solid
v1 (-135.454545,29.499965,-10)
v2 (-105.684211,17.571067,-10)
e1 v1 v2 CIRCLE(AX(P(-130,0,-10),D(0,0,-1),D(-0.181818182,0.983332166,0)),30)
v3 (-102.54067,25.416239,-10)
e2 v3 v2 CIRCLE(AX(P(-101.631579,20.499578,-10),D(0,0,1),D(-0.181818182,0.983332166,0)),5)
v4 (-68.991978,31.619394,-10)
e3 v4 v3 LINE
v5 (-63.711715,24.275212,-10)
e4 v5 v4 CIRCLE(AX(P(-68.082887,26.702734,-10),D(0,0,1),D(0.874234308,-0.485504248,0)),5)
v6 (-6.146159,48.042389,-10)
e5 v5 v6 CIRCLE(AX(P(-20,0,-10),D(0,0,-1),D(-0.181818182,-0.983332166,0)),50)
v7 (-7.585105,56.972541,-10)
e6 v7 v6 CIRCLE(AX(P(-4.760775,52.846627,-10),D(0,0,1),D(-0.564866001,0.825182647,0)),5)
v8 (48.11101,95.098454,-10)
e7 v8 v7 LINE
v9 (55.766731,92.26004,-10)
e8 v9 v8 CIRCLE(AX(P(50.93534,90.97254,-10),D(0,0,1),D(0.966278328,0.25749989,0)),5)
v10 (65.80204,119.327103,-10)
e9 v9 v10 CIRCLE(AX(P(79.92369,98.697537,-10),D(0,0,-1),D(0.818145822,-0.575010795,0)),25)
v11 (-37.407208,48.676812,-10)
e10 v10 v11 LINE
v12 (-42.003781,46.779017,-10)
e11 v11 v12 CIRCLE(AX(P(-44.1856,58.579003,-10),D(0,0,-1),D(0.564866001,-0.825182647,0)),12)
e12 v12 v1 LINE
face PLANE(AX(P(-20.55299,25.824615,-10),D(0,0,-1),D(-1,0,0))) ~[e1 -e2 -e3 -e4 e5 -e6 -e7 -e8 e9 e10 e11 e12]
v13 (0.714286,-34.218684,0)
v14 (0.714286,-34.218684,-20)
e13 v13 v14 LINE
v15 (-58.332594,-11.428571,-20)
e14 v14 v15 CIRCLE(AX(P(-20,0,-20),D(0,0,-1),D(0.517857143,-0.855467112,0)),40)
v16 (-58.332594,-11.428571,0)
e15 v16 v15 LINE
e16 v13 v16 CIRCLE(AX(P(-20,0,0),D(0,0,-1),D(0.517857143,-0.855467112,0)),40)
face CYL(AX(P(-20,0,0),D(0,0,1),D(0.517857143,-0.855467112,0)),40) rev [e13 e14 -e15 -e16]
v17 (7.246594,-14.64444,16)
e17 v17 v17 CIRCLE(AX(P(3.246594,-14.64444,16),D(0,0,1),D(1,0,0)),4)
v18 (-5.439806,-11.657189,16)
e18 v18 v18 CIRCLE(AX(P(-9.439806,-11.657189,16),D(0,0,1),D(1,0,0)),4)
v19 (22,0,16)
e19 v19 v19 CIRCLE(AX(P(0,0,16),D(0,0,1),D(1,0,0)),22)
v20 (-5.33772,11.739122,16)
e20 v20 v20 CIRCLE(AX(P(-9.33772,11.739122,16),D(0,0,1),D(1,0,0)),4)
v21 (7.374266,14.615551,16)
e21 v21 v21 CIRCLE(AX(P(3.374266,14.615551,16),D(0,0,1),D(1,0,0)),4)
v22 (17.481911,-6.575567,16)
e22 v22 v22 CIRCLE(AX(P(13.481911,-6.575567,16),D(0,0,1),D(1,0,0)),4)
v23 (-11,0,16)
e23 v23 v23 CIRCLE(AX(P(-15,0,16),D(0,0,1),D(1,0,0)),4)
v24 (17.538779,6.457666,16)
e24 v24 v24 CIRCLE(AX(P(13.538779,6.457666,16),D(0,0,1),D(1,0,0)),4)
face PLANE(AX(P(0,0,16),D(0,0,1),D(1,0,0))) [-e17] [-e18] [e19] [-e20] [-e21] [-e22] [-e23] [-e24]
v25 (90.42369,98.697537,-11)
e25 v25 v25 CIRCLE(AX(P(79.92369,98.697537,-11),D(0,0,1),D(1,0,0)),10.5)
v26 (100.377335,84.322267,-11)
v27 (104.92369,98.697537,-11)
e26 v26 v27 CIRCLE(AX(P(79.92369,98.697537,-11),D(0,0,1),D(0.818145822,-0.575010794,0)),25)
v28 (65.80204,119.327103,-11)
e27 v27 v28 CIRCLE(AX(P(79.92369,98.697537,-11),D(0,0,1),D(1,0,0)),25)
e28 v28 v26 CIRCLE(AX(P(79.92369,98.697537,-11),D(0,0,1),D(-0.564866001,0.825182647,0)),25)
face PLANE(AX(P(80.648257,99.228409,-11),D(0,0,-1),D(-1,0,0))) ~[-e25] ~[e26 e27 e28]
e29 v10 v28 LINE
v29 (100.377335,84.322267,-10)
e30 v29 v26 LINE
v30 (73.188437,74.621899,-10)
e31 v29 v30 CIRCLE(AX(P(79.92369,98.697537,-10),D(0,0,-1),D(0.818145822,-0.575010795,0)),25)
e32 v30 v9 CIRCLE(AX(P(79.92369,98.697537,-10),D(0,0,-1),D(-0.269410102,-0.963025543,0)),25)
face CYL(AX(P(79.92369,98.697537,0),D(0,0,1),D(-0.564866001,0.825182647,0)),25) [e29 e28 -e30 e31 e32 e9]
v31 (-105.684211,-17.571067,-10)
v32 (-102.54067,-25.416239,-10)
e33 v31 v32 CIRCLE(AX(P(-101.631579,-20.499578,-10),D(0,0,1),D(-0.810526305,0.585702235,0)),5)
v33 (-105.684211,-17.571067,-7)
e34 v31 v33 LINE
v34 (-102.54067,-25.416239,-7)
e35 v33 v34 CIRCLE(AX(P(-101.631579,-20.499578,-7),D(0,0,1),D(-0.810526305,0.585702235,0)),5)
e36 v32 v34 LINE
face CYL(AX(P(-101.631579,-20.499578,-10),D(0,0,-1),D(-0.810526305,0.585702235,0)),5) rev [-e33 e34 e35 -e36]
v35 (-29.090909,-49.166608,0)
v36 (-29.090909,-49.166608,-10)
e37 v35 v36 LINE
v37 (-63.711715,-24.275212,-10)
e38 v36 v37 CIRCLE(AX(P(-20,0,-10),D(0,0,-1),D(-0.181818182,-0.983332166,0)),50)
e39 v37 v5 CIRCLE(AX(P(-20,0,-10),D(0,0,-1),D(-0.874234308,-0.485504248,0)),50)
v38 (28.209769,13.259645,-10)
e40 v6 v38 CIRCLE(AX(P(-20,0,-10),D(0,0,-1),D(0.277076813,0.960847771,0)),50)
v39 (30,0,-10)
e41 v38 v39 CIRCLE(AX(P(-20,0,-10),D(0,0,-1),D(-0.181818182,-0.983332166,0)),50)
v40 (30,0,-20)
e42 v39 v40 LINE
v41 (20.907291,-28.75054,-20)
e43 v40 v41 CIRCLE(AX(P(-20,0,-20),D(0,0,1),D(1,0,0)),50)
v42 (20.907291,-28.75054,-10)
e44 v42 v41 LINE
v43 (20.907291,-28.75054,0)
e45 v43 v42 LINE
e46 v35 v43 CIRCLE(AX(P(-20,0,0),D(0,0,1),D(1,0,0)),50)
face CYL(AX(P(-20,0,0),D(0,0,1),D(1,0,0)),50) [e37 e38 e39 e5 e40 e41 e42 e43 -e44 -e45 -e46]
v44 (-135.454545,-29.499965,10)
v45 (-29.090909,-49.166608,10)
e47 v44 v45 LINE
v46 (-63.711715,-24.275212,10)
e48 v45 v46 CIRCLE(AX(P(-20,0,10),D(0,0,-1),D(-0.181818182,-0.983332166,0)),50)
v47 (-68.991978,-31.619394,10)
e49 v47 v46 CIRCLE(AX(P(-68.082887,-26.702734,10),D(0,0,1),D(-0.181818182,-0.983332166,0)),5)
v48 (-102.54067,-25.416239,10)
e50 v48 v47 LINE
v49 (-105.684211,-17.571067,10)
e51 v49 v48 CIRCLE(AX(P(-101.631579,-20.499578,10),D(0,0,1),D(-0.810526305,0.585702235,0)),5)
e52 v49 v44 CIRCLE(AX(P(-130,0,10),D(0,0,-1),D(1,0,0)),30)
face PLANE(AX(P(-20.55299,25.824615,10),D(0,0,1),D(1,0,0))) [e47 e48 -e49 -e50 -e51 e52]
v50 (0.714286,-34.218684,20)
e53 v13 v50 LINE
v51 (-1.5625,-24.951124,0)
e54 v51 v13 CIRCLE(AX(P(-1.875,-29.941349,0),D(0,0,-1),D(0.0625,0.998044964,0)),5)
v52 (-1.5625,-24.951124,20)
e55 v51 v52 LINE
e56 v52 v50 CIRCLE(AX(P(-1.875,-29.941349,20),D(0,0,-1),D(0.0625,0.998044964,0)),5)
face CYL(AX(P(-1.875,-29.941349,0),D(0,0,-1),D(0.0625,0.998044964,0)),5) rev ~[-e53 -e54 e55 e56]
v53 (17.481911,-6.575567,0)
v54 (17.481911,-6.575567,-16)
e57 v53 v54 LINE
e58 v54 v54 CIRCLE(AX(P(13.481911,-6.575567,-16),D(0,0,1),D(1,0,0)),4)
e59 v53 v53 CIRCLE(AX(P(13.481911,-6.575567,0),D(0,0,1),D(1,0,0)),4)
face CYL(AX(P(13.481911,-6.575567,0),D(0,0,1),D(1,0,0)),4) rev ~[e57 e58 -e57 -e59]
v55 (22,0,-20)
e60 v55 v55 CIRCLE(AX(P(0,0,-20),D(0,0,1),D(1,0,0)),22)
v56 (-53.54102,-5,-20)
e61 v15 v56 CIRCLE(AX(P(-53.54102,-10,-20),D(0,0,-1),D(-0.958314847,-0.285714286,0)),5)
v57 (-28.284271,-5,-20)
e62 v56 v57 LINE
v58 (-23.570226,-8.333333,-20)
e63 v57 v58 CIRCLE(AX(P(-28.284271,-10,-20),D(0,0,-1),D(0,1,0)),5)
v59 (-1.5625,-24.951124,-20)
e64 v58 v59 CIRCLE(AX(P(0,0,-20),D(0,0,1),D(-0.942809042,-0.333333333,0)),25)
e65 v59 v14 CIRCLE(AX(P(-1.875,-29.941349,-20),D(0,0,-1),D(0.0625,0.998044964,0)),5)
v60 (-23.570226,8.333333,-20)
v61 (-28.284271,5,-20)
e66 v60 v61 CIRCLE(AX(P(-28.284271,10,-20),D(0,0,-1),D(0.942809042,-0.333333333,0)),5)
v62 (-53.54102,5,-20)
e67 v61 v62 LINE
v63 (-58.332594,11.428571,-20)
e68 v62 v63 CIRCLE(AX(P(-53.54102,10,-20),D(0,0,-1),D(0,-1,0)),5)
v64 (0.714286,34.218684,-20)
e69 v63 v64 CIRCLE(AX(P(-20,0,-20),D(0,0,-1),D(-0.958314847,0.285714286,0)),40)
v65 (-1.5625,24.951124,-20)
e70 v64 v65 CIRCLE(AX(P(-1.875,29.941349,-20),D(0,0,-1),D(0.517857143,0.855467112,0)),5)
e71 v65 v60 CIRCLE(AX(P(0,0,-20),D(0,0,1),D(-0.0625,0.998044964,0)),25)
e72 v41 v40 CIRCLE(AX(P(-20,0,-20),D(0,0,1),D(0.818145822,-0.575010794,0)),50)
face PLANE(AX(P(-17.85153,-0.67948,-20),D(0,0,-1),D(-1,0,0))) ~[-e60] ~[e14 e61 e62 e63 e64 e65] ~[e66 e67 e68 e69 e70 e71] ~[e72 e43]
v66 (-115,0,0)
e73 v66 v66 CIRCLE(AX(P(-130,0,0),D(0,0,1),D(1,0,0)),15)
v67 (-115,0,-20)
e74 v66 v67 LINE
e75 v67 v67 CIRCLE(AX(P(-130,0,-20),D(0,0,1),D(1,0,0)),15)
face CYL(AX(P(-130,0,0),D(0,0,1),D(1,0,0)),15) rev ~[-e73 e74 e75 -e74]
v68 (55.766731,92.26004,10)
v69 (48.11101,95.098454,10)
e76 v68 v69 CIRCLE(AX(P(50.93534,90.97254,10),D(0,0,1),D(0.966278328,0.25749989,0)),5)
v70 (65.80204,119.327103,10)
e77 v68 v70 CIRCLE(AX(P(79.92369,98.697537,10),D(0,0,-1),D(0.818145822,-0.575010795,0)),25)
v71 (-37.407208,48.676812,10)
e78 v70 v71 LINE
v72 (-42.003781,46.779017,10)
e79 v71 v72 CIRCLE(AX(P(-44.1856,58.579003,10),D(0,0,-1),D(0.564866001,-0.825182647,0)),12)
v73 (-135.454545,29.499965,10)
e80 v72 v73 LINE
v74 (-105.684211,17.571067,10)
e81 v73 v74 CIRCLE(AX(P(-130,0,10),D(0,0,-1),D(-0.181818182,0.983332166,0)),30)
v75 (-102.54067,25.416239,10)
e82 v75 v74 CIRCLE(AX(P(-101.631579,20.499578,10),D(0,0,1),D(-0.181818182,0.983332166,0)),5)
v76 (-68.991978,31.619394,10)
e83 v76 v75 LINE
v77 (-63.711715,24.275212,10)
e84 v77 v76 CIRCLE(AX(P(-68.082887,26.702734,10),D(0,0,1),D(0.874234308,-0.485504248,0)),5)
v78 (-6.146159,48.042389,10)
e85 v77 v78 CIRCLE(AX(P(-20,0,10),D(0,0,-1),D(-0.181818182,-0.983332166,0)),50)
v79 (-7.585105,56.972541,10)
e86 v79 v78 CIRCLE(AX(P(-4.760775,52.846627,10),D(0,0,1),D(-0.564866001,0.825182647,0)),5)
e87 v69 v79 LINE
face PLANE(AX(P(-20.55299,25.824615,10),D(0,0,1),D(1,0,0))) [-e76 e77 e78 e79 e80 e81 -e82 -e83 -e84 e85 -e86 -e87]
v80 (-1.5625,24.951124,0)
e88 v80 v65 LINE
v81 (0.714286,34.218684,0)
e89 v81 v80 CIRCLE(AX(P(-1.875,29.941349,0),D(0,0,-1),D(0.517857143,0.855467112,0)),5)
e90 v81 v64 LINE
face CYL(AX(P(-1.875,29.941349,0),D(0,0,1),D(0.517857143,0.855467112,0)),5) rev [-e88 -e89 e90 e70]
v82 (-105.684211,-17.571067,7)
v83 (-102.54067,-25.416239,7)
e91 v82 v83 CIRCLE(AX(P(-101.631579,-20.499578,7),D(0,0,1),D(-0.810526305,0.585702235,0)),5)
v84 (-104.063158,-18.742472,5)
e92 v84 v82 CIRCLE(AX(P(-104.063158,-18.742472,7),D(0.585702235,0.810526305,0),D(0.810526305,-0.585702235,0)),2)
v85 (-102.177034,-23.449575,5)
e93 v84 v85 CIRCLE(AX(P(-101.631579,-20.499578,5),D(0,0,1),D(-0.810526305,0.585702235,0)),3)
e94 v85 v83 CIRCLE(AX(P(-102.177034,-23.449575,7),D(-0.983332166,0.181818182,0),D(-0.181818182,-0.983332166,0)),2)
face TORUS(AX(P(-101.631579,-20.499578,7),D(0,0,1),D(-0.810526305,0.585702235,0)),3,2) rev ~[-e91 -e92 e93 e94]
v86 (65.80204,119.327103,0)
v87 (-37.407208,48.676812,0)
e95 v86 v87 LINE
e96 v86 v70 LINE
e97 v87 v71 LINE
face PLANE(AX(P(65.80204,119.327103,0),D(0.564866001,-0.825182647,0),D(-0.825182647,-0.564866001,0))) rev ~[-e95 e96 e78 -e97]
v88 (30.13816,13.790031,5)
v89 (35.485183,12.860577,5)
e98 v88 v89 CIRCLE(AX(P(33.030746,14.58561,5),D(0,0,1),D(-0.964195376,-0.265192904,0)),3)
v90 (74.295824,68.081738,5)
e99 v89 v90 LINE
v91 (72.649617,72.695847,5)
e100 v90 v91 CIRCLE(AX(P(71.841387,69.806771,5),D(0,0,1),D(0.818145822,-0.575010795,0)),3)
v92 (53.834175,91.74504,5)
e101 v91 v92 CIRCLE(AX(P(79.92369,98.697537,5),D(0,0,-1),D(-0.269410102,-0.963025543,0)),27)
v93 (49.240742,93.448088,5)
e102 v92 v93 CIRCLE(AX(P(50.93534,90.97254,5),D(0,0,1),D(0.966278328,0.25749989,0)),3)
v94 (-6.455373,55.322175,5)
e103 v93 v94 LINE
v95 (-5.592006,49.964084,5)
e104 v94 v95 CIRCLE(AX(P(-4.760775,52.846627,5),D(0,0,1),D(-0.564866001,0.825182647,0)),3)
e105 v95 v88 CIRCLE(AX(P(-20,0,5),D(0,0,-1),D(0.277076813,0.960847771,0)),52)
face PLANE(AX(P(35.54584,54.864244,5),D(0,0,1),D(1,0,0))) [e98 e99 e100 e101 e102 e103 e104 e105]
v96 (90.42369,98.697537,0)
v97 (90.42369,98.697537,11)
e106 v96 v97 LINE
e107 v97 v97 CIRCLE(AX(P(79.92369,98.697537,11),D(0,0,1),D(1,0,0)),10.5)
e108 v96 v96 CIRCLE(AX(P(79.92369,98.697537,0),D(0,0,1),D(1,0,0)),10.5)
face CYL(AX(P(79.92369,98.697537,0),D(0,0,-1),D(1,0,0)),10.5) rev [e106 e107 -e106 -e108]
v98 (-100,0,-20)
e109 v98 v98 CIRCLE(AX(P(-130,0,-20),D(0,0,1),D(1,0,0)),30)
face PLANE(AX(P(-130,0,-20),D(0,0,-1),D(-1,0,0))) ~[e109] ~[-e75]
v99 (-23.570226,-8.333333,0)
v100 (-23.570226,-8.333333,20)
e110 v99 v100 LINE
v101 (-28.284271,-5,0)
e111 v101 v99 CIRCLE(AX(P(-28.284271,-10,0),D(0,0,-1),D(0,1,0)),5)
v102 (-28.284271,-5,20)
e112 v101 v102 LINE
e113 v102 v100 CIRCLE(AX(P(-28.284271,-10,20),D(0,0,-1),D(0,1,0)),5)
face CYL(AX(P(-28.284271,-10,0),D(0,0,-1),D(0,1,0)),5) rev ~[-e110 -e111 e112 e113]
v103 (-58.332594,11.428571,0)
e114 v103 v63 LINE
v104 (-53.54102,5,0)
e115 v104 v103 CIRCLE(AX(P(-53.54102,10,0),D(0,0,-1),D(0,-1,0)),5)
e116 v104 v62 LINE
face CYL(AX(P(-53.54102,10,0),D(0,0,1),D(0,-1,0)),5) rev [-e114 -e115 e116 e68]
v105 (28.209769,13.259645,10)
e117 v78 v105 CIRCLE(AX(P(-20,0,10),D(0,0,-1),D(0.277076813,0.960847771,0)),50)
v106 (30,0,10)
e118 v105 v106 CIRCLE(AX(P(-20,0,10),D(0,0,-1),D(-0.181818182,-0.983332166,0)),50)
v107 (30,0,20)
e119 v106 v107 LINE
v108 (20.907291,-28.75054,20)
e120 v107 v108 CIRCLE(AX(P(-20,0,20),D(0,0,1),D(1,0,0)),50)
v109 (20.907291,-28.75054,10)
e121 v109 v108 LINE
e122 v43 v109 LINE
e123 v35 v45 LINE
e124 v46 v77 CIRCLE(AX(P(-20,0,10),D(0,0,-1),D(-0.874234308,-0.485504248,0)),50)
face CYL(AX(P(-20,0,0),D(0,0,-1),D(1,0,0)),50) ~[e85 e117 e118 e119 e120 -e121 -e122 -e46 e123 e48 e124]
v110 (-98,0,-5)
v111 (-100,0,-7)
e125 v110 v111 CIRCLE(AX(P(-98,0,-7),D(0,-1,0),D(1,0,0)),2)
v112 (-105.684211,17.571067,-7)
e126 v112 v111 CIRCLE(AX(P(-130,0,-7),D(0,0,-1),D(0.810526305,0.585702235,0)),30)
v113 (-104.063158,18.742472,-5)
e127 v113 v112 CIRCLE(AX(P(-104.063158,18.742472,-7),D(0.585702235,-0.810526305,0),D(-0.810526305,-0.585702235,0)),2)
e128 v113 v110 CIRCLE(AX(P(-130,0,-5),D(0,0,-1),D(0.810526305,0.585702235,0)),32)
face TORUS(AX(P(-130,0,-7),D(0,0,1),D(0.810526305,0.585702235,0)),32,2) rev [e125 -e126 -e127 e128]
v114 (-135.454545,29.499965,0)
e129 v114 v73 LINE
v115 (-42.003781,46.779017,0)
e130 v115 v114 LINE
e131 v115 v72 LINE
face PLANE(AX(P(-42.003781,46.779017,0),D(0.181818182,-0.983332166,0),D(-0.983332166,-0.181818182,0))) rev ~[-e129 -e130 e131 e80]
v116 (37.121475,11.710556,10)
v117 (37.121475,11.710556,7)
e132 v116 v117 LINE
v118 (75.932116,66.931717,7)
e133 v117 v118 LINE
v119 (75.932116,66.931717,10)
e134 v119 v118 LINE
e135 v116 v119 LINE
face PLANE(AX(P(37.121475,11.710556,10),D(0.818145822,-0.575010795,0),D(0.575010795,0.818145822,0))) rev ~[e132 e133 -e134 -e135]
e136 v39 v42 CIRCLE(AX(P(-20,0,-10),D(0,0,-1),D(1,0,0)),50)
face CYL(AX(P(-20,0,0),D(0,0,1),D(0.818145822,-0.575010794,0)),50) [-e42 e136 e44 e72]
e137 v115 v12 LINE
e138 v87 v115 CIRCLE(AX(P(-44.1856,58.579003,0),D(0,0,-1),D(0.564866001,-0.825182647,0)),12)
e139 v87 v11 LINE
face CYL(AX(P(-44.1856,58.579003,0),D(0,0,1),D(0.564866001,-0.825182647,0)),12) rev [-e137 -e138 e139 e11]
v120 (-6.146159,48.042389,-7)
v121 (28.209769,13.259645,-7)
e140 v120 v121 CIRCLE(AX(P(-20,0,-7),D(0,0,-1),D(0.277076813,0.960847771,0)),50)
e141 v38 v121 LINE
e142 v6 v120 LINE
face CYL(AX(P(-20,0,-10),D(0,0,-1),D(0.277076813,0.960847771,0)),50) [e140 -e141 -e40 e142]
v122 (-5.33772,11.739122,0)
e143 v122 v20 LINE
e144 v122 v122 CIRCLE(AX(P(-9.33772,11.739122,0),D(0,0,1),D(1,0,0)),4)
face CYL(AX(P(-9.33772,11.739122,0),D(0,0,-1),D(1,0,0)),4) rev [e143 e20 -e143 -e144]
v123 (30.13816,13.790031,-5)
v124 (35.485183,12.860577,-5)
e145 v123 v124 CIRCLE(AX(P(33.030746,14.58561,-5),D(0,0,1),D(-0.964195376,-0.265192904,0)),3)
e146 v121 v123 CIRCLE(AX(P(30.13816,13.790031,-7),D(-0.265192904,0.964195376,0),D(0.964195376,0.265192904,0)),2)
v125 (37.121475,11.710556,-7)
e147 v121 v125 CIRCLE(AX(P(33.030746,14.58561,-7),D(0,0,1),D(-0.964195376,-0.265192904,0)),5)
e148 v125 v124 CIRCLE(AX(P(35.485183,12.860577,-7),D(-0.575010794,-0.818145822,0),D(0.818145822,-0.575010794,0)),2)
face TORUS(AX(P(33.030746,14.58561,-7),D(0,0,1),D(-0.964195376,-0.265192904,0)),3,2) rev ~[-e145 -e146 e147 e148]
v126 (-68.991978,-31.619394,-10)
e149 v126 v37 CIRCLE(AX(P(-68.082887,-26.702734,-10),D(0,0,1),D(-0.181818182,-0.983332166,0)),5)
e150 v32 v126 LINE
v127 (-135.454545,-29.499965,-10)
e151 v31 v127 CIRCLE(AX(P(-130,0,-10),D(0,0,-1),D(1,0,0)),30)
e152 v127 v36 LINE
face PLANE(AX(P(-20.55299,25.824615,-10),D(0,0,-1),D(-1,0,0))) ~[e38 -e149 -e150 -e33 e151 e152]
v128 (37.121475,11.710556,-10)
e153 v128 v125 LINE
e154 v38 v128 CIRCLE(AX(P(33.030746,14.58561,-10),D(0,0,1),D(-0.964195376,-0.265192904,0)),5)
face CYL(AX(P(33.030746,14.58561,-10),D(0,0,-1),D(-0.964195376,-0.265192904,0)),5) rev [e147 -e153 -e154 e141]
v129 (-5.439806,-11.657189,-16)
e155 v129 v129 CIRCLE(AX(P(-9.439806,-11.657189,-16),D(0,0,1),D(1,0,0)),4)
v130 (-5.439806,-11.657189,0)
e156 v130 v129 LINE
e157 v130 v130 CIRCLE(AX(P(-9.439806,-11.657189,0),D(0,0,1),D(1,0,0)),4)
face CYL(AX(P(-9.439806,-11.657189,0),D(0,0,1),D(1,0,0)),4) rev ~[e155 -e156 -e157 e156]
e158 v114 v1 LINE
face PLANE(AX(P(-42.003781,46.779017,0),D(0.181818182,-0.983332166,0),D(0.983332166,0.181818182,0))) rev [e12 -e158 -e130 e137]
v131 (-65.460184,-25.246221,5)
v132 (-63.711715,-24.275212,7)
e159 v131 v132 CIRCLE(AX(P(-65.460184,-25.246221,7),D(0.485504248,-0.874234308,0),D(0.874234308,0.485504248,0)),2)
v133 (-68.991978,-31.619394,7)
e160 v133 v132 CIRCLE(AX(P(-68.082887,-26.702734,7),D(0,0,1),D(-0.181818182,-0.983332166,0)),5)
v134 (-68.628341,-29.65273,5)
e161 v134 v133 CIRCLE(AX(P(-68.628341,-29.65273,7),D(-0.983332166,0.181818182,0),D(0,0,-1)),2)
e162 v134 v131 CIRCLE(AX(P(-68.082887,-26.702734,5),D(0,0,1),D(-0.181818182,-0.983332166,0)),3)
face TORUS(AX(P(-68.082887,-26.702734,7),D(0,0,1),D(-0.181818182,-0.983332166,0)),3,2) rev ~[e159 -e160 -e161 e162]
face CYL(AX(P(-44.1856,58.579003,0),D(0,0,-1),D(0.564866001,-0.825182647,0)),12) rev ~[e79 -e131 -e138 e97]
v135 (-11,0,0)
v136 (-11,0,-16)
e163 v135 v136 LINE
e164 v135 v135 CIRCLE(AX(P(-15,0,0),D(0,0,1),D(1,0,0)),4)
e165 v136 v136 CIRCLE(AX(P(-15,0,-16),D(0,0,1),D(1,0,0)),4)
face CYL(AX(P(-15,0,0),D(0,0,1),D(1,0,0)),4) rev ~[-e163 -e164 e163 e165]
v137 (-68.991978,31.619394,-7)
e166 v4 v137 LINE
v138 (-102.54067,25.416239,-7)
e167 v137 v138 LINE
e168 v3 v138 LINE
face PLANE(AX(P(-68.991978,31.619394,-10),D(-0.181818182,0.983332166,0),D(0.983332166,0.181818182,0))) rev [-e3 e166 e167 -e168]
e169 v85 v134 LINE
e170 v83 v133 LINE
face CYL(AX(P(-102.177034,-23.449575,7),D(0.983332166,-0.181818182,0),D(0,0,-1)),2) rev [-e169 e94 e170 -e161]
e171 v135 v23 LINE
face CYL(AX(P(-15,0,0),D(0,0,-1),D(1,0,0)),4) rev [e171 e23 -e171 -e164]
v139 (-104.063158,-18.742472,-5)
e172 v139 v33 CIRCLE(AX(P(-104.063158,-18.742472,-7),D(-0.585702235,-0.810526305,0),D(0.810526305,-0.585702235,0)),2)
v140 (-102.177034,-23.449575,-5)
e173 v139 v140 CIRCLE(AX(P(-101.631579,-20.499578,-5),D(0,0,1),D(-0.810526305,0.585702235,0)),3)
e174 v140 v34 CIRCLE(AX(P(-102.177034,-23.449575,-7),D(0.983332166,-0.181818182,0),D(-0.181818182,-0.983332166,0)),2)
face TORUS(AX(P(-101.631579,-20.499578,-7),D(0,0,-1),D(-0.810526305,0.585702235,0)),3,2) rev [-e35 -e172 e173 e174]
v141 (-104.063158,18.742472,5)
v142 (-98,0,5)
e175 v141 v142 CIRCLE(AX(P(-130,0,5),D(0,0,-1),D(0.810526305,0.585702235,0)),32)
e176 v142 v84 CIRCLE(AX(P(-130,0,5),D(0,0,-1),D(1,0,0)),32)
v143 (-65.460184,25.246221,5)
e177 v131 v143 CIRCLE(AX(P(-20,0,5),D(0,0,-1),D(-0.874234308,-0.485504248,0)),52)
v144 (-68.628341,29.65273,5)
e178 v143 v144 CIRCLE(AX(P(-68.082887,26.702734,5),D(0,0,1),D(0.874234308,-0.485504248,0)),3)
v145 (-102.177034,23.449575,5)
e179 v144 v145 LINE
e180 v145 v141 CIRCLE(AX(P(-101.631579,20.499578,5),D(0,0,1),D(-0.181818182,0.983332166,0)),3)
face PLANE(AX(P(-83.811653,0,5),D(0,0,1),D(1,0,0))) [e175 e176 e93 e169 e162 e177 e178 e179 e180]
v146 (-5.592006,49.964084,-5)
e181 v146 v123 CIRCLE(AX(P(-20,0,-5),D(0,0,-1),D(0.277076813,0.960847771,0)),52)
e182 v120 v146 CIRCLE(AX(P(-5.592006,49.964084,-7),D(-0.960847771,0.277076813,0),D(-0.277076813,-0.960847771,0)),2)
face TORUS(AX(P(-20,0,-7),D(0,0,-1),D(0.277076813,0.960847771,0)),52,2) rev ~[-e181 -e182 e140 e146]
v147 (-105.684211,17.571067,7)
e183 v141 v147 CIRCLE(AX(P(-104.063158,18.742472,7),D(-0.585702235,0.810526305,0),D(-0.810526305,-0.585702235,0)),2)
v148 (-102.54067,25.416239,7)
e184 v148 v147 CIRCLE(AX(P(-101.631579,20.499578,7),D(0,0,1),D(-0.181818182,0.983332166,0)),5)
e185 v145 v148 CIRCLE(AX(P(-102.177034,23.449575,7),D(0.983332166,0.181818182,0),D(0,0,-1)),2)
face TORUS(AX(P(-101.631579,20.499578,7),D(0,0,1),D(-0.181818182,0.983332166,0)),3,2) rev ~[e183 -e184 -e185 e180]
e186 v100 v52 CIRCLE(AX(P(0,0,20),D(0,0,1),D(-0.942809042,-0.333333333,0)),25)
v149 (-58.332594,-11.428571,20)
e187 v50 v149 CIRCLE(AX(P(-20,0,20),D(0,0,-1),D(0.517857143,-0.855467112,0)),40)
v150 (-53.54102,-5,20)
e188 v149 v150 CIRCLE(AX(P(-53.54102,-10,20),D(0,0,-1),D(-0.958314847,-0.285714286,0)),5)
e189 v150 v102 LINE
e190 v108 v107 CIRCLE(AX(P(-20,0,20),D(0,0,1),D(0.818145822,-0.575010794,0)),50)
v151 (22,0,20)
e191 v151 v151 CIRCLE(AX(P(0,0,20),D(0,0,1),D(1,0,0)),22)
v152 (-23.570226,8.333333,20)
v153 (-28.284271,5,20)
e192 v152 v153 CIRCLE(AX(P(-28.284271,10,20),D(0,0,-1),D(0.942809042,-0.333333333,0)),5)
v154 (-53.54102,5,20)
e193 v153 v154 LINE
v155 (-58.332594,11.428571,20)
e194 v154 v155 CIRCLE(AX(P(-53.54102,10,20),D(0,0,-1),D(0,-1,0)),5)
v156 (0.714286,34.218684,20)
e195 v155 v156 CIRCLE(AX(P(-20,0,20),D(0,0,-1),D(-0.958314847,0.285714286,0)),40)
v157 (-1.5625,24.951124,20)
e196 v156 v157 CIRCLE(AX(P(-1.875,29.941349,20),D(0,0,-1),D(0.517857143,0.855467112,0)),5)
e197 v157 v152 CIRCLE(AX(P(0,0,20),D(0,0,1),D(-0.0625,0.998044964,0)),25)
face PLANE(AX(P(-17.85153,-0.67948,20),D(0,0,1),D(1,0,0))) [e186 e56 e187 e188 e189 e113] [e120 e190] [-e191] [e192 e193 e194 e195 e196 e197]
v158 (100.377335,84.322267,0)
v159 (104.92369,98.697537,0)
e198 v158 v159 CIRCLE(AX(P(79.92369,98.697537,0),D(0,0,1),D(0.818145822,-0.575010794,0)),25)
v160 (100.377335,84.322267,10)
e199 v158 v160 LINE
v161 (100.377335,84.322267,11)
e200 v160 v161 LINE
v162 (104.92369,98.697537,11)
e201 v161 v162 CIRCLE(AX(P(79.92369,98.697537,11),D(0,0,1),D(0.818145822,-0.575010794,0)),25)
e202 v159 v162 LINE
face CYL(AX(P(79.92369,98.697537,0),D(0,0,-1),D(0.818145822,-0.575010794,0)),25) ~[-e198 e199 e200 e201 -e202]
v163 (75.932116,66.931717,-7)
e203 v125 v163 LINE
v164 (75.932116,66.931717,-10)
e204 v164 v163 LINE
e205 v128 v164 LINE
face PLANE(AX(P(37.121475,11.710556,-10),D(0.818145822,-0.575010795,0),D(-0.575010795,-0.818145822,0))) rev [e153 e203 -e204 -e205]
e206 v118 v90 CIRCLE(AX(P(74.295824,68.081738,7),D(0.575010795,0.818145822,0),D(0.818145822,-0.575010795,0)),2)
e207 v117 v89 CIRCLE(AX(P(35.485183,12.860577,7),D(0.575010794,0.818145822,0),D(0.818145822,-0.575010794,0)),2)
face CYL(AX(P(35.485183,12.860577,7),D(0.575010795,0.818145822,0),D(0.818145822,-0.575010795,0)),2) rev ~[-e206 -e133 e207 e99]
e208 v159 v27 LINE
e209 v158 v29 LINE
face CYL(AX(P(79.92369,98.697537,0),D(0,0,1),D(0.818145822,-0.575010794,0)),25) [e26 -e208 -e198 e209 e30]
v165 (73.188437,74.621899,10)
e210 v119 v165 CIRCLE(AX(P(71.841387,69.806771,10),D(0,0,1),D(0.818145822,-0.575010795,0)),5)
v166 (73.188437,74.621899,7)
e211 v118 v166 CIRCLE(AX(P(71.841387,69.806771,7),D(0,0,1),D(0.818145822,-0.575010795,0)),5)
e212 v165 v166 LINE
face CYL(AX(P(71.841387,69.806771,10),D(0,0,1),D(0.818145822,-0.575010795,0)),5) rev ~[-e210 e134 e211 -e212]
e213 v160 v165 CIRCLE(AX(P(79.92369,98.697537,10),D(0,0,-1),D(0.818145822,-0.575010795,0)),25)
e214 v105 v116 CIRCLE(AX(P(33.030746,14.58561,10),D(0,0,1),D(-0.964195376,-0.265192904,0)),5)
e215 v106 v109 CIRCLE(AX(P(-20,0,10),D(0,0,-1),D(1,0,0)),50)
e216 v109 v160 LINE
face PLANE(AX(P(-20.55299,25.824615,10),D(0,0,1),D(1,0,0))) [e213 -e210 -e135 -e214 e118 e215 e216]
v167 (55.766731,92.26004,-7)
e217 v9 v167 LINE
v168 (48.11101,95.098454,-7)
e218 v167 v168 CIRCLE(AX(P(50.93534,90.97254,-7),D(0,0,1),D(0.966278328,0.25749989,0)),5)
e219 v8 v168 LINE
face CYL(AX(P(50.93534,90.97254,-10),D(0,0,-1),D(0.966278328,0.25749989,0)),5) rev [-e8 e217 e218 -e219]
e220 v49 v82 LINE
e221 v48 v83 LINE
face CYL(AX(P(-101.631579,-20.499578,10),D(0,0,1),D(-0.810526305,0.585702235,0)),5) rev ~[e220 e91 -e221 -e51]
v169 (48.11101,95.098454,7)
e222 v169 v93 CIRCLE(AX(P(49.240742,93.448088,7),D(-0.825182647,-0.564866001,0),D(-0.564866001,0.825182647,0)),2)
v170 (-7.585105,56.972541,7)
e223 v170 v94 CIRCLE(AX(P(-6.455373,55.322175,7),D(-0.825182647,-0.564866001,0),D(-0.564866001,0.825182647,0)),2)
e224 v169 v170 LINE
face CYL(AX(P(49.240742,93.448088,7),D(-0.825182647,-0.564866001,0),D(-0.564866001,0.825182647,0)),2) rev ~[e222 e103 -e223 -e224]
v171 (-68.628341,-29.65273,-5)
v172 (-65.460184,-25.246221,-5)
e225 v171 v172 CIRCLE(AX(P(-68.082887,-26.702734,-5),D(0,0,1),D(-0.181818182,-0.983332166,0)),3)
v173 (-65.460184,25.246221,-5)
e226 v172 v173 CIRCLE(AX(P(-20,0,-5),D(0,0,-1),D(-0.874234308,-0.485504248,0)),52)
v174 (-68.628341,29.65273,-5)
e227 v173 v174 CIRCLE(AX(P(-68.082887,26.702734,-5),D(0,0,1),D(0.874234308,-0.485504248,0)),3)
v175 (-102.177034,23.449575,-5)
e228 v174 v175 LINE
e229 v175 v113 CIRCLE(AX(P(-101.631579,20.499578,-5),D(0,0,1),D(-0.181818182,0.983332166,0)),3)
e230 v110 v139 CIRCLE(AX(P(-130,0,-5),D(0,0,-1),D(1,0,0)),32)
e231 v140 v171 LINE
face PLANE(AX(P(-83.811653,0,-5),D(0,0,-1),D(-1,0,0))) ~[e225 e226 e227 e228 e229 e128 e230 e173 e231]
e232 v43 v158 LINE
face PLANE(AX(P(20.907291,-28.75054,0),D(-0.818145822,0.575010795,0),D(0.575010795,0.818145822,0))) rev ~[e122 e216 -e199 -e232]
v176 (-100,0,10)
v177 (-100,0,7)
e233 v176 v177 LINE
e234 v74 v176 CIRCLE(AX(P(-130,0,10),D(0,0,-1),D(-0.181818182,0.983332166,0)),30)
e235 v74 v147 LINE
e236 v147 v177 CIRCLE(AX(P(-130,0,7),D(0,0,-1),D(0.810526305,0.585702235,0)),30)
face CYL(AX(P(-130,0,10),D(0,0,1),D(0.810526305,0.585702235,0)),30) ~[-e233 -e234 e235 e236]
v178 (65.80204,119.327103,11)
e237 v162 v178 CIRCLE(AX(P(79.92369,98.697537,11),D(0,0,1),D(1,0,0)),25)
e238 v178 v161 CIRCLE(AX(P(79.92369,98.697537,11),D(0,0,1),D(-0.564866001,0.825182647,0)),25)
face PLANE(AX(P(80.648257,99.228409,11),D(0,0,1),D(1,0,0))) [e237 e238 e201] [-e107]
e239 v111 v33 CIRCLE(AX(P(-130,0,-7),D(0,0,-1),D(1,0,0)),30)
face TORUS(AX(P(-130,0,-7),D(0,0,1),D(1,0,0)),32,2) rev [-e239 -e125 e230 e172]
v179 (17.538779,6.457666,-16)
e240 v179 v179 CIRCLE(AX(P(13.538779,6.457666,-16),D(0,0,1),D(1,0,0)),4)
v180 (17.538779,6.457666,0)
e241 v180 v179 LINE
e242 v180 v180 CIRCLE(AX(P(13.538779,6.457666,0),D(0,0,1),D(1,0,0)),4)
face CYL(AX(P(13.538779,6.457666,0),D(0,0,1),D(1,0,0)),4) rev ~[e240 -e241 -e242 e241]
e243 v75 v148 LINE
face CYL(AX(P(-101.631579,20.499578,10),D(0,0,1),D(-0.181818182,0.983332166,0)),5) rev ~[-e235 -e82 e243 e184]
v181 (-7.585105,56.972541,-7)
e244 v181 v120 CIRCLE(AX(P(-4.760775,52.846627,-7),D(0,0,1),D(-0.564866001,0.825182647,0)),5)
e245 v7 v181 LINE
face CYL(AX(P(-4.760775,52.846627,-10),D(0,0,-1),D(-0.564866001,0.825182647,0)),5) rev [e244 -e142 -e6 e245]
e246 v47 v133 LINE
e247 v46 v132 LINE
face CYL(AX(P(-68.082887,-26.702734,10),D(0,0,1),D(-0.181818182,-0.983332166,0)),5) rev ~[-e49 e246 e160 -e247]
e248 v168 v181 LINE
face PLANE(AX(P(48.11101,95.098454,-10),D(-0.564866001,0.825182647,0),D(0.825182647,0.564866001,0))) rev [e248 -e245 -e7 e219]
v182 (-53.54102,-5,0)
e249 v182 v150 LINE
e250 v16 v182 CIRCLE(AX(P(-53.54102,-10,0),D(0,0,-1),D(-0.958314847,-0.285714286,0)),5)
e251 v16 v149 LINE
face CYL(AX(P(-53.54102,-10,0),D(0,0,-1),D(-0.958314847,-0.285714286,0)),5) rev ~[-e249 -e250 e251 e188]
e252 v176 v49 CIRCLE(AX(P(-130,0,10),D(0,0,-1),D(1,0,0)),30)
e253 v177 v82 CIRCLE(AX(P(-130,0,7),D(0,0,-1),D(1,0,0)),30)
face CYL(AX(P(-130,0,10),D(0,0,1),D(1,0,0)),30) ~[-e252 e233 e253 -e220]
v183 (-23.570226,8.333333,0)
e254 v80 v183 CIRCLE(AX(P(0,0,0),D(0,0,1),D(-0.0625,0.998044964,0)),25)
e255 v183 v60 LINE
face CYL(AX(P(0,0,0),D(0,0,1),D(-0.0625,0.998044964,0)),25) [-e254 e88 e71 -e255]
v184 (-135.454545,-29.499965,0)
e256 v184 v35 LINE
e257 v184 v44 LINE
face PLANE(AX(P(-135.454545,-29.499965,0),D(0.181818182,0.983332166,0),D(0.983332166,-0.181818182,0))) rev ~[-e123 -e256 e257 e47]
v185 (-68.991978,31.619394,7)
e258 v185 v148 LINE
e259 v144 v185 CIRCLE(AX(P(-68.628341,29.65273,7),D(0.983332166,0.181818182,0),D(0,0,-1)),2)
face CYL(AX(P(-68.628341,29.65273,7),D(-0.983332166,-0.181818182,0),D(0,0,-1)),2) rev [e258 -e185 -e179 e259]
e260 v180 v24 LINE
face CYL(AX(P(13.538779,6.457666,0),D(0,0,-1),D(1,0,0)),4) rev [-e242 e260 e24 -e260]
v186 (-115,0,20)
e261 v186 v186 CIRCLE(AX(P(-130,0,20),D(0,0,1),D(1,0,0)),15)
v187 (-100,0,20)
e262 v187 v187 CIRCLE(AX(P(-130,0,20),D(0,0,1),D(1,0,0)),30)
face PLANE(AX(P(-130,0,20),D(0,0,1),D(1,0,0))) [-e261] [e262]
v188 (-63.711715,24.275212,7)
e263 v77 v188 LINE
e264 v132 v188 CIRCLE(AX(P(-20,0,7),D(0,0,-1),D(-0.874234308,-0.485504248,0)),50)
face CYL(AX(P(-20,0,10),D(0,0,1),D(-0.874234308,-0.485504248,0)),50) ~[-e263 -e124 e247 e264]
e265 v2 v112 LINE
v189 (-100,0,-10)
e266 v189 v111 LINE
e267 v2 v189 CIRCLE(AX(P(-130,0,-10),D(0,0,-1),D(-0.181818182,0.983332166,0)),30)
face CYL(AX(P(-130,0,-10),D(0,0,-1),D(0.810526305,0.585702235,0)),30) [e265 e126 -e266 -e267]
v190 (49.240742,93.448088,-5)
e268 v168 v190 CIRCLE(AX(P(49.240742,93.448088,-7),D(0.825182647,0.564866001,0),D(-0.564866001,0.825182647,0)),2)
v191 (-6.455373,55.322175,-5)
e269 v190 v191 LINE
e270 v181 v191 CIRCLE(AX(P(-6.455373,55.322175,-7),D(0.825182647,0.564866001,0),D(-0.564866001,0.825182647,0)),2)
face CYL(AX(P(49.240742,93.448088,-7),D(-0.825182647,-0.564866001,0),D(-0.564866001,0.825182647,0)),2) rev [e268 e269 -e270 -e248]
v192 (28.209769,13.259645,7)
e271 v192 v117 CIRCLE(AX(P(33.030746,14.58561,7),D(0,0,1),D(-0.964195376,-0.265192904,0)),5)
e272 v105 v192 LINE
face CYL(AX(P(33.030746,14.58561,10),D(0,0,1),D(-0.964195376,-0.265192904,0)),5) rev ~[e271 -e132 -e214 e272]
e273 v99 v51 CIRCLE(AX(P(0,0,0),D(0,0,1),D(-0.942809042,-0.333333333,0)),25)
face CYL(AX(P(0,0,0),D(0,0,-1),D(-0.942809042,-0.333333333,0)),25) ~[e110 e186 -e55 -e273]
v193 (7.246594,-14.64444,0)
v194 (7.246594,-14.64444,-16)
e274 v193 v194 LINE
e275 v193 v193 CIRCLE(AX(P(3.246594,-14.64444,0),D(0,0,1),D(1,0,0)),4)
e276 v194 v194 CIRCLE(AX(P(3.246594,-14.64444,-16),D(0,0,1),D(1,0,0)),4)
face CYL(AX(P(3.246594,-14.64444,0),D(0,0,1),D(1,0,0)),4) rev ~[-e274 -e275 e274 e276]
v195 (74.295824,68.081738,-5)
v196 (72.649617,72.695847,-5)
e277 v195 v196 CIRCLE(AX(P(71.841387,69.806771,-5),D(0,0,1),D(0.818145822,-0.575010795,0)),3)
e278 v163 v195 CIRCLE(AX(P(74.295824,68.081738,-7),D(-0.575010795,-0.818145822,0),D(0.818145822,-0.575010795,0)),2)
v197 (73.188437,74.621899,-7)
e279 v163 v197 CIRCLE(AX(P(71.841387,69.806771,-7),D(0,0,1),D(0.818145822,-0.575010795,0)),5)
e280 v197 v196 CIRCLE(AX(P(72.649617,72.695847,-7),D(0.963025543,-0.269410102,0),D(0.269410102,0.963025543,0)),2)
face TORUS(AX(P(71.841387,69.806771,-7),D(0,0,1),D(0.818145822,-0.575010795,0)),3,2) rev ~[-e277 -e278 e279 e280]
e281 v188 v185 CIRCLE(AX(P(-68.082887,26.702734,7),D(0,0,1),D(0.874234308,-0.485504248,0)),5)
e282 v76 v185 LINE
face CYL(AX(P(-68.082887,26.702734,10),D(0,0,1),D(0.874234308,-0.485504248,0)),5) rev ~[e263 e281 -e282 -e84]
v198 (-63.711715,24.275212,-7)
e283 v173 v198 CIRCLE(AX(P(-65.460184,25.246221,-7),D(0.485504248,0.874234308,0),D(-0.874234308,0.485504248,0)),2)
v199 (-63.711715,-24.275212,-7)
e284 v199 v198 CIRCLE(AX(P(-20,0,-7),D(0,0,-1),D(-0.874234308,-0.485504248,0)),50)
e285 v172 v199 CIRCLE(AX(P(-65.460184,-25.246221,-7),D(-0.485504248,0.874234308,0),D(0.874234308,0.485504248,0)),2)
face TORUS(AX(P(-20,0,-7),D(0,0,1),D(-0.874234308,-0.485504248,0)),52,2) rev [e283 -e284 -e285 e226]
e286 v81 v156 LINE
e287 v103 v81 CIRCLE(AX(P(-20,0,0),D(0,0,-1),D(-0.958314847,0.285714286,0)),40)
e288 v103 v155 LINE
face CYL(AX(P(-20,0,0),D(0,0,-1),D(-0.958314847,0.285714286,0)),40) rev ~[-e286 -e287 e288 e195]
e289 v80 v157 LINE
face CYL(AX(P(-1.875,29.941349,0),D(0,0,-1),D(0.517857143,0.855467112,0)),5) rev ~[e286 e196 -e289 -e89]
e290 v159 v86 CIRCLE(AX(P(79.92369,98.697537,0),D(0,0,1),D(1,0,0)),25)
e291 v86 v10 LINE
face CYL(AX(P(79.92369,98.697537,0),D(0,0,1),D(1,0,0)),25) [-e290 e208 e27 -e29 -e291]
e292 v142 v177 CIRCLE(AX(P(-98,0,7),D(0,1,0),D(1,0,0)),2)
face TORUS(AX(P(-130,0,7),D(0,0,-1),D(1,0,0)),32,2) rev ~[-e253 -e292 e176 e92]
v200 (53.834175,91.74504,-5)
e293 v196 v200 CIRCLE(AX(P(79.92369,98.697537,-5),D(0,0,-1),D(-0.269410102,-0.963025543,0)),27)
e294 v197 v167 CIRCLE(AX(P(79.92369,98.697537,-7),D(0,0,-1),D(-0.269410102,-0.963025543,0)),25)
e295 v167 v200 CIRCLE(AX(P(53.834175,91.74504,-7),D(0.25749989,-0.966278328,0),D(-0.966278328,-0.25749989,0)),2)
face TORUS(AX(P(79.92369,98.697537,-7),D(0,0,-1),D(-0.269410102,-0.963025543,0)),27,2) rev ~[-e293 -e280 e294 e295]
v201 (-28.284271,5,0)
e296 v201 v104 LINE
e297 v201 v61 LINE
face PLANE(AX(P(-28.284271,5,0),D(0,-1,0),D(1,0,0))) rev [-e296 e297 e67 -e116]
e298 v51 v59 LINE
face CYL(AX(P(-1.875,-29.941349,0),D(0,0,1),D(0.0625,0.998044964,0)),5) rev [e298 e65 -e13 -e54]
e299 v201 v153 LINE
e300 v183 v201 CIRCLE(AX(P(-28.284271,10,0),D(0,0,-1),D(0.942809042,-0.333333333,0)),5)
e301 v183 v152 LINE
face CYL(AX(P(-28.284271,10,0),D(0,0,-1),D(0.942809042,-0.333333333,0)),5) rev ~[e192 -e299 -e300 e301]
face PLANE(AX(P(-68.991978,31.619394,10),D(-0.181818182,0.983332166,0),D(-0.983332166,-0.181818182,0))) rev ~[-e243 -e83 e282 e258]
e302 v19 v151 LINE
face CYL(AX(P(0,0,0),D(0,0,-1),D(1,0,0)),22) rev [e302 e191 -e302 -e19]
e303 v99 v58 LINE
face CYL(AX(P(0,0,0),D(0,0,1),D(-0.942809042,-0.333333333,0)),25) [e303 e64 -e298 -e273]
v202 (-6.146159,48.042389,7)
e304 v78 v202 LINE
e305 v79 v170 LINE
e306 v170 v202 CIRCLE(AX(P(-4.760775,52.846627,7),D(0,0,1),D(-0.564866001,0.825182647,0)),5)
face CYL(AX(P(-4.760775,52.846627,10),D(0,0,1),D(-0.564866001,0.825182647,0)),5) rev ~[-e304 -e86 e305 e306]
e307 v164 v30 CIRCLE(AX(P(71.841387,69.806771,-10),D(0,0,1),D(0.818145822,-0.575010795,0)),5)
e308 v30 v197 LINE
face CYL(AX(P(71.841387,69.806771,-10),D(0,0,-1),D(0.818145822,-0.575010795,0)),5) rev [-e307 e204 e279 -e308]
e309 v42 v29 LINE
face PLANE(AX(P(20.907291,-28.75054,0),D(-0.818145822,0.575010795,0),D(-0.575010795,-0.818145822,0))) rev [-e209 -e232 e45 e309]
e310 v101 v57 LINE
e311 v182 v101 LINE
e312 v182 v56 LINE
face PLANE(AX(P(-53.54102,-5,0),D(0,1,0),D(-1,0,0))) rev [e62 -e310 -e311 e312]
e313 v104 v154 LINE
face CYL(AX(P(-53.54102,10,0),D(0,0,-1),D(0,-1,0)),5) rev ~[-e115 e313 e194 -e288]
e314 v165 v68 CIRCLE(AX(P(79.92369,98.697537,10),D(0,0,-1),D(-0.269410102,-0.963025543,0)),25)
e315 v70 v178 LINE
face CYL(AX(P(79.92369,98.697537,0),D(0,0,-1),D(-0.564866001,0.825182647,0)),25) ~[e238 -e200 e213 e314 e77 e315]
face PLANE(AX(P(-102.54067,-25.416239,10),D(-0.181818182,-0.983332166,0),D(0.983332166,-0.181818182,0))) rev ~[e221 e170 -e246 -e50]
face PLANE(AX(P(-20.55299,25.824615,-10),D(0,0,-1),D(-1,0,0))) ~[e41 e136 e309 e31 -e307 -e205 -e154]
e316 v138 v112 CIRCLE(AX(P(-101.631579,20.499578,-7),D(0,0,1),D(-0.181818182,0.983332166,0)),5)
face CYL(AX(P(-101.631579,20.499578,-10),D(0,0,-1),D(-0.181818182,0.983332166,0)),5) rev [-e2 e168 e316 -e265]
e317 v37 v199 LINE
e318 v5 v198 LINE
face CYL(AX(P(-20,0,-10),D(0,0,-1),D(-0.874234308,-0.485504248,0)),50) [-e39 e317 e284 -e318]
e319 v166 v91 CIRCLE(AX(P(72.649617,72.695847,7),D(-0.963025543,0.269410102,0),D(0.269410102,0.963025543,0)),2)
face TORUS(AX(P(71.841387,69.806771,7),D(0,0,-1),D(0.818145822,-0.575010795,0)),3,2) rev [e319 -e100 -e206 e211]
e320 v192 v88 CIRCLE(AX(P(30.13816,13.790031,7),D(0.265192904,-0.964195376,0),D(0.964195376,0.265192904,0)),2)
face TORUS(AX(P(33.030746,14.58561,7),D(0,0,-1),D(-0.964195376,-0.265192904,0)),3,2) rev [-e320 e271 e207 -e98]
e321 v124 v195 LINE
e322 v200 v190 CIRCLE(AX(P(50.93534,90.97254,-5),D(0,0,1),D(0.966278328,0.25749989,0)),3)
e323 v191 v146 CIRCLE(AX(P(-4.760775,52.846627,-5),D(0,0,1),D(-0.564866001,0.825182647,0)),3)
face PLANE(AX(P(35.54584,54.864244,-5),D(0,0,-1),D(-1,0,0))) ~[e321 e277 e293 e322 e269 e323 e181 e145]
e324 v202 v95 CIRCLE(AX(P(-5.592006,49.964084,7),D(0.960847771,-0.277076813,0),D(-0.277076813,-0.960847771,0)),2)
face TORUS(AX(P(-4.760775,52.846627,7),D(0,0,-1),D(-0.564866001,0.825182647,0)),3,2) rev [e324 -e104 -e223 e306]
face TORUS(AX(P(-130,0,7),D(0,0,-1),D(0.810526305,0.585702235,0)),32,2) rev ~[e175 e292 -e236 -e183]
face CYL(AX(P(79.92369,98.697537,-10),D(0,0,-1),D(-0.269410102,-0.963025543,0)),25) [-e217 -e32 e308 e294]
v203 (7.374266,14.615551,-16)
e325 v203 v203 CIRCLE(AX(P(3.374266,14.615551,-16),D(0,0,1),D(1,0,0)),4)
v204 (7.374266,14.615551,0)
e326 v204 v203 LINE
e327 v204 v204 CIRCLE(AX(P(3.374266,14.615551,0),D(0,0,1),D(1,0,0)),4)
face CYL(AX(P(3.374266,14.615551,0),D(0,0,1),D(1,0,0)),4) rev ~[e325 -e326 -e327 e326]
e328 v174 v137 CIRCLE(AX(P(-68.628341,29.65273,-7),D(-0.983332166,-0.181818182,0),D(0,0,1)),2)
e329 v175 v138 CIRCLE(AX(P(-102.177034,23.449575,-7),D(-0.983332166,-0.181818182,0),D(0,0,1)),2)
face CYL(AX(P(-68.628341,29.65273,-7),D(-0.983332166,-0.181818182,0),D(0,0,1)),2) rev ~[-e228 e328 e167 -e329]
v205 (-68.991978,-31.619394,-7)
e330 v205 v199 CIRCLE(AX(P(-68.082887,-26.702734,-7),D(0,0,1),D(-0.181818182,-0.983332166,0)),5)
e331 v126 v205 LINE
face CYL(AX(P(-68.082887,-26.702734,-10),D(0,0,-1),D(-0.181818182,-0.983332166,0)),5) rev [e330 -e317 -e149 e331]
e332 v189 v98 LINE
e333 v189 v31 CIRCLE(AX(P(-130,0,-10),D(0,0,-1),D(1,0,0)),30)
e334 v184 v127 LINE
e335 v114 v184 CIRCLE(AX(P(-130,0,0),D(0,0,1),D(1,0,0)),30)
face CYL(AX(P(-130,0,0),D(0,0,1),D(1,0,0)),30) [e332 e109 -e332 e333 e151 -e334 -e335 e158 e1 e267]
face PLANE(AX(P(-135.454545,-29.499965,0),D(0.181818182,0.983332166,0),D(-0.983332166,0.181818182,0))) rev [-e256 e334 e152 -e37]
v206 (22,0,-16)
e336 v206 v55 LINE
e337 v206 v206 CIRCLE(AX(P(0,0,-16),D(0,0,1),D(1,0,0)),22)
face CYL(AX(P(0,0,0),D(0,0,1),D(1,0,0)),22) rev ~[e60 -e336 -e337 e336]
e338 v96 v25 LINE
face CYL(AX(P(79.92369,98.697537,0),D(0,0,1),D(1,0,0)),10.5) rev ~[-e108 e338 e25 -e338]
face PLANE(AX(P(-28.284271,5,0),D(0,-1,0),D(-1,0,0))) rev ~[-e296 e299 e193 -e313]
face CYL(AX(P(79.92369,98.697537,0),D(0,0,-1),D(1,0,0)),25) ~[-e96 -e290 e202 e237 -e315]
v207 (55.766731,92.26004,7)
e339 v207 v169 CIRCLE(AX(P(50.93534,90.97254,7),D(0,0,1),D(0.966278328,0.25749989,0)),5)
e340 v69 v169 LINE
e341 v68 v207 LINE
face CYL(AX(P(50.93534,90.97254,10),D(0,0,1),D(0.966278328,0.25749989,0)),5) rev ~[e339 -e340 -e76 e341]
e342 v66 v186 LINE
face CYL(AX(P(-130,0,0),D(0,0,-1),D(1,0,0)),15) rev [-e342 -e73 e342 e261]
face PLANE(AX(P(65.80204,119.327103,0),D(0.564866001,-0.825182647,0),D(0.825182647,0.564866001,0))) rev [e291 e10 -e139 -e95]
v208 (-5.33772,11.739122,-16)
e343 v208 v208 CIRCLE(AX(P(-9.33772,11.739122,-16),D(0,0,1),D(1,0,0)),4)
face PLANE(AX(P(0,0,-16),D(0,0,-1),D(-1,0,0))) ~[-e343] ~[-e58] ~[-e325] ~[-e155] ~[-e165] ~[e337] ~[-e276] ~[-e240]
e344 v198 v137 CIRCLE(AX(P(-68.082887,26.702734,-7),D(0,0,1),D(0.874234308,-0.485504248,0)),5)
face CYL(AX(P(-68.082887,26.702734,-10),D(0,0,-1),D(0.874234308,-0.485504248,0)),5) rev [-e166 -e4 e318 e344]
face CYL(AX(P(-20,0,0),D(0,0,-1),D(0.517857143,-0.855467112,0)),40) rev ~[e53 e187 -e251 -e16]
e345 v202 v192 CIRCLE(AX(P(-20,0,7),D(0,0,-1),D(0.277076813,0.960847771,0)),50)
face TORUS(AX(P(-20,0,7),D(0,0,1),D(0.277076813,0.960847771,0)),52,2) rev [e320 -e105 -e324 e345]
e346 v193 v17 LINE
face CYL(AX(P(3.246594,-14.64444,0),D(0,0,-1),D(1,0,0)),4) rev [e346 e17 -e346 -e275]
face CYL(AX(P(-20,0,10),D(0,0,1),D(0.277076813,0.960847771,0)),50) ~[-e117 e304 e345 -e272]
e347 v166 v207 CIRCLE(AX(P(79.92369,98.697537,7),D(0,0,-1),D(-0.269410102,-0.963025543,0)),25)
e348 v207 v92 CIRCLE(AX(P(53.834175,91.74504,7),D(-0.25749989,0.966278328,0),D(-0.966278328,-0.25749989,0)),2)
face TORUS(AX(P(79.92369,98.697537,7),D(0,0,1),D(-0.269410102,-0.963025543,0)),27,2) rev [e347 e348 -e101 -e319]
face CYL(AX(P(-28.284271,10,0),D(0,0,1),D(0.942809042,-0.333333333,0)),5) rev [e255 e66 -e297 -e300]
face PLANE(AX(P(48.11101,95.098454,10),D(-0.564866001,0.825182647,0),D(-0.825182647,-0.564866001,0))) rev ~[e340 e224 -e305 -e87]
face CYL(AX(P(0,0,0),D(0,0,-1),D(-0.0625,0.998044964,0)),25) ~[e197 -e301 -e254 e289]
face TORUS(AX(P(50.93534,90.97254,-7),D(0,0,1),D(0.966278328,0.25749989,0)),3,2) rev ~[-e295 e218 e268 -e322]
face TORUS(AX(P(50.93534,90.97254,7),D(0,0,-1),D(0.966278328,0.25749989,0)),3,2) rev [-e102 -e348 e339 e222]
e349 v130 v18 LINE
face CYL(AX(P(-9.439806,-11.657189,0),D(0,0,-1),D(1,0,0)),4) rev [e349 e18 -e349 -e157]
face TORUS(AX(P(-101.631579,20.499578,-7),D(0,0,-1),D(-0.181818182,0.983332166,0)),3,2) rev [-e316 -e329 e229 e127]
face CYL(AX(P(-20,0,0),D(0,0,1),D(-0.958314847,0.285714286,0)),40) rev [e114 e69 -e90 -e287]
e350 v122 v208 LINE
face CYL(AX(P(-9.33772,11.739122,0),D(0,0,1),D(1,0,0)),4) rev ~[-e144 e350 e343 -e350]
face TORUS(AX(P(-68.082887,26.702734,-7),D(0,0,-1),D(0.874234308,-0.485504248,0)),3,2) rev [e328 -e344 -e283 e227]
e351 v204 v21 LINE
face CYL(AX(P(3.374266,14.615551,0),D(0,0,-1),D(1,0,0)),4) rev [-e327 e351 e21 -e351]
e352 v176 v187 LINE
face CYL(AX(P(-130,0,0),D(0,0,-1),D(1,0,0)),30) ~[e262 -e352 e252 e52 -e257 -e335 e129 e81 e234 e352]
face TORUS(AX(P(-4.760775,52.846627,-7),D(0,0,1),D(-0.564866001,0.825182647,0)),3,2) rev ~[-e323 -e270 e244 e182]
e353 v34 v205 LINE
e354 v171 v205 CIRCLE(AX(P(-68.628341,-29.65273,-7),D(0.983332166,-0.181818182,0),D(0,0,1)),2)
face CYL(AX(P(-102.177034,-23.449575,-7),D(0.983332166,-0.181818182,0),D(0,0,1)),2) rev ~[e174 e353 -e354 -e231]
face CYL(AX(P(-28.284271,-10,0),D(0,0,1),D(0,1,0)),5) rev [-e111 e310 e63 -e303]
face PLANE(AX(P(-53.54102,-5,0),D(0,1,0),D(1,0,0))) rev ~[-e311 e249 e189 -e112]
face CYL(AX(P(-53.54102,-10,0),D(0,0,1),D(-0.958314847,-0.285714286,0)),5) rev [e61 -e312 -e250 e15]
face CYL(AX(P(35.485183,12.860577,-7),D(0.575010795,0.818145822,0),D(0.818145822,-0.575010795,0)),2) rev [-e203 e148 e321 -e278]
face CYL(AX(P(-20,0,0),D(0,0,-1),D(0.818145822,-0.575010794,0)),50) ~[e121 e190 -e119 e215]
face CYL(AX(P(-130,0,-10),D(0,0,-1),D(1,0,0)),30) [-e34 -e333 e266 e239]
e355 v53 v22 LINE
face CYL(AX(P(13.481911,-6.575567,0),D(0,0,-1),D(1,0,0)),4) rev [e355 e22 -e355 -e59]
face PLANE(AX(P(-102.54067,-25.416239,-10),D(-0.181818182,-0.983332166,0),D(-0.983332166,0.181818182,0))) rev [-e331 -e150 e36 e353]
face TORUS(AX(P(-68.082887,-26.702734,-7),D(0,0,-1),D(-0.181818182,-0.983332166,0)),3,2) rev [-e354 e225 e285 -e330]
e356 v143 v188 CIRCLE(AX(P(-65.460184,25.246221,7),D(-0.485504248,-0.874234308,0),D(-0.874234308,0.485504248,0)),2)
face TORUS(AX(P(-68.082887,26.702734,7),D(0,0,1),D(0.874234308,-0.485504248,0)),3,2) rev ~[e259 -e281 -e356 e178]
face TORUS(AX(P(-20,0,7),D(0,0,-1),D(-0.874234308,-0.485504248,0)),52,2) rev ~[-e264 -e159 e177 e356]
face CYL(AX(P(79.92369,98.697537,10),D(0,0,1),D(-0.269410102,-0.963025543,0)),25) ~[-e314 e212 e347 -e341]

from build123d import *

# Parameters (mm, degrees)
F0_R     = 15
F1_DEPTH = 20
F0_R_2   = 22
F2_DEPTH = 20
F0_R_3   = 4
F3_DEPTH = 16
F0_R_4   = 10.5
F4_DEPTH = 11
F5_DEPTH = 10
F7_DEPTH = 5
F8_R     = 2


# Not quite as in the source:
# - a feature names something its author has since deleted; it is built from what else it names


with BuildPart() as f1:
    # F0 (on Top) → F1 (new body)
    with BuildSketch(Plane.XY):
        with BuildLine():
            ThreePointArc((-135.4545454545, -29.4999649811), (-110.811935528, -23.0611834436), (-100, 0))
            ThreePointArc((-100, 0), (-110.811935528, 23.0611834436), (-135.4545454545, 29.4999649811))
            ThreePointArc((-135.4545454545, 29.4999649811), (-160, 0), (-135.4545454545, -29.4999649811))
        make_face()
        with Locations((-130, 0)):
            Circle(F0_R, mode=Mode.SUBTRACT)
    extrude(amount=F1_DEPTH)



with BuildPart() as f2:
    # F0 (on Top) → F2 (new body)
    with BuildSketch(Plane.XY):
        with BuildLine():
            ThreePointArc((30, 0), (-51.9801074533, 38.4353057393), (-29.0909090909, -49.1666083018))
            ThreePointArc((-29.0909090909, -49.1666083018), (-1.0982935918, -46.2895830059), (20.9072911046, -28.7505397251))
            ThreePointArc((20.9072911046, -28.7505397251), (27.6726575472, -15.0770594741), (30, 0))
        make_face()
        with BuildLine():
            ThreePointArc((0.7142857143, -34.2186844772), (-34.4030729021, -37.3169062353), (-58.3325939, -11.4285714286))
            ThreePointArc((-58.3325939, -11.4285714286), (-57.5499382912, -7.0119284767), (-53.5410196625, -5))
            Line((-53.5410196625, -5), (-28.2842712475, -5))
            ThreePointArc((-28.2842712475, -5), (-25.3975199015, -5.9175170954), (-23.5702260396, -8.3333333333))
            ThreePointArc((-23.5702260396, -8.3333333333), (-15.0649003322, -19.9511598154), (-1.5625, -24.9511240979))
            ThreePointArc((-1.5625, -24.9511240979), (2.9806162254, -28.7484570232), (0.7142857143, -34.2186844772))
        make_face(mode=Mode.SUBTRACT)
        with BuildLine():
            Line((-28.2842712475, 5), (-53.5410196625, 5))
            ThreePointArc((-53.5410196625, 5), (-57.5499382912, 7.0119284767), (-58.3325939, 11.4285714286))
            ThreePointArc((-58.3325939, 11.4285714286), (-34.4030729021, 37.3169062353), (0.7142857143, 34.2186844772))
            ThreePointArc((0.7142857143, 34.2186844772), (2.9806162254, 28.7484570232), (-1.5625, 24.9511240979))
            ThreePointArc((-1.5625, 24.9511240979), (-15.0649003322, 19.9511598154), (-23.5702260396, 8.3333333333))
            ThreePointArc((-23.5702260396, 8.3333333333), (-25.3975199015, 5.9175170954), (-28.2842712475, 5))
        make_face(mode=Mode.SUBTRACT)
        Circle(F0_R_2, mode=Mode.SUBTRACT)
    extrude(amount=F2_DEPTH)

    # F0 (on Top) → F3 (join)
    with BuildSketch(Plane.XY):
        Circle(F0_R_2)
        with Locations((3.2465942091, -14.6444401068)):
            Circle(F0_R_3, mode=Mode.SUBTRACT)
        with Locations((-9.4398058657, -11.6571894219)):
            Circle(F0_R_3, mode=Mode.SUBTRACT)
        with Locations((-15, 0)):
            Circle(F0_R_3, mode=Mode.SUBTRACT)
        with Locations((-9.3377195496, 11.7391223528)):
            Circle(F0_R_3, mode=Mode.SUBTRACT)
        with Locations((3.3742658152, 14.6155509718)):
            Circle(F0_R_3, mode=Mode.SUBTRACT)
        with Locations((13.4819106945, -6.5755672018)):
            Circle(F0_R_3, mode=Mode.SUBTRACT)
        with Locations((13.5387792652, 6.4576664521)):
            Circle(F0_R_3, mode=Mode.SUBTRACT)
    extrude(amount=F3_DEPTH)


with BuildPart() as f4:
    # F0 (on Top) → F4 (new body)
    with BuildSketch(Plane.XY):
        with BuildLine():
            ThreePointArc((104.9236896633, 98.697537105), (91.5847091217, 120.8113478393), (65.8020396479, 119.3271032867))
            ThreePointArc((65.8020396479, 119.3271032867), (62.1372291248, 81.1293322591), (100.3773352156, 84.3222672425))
            ThreePointArc((100.3773352156, 84.3222672425), (103.7600184369, 91.159007368), (104.9236896633, 98.697537105))
        make_face()
        with Locations((79.9236896633, 98.697537105)):
            Circle(F0_R_4, mode=Mode.SUBTRACT)
    extrude(amount=F4_DEPTH)


with BuildPart() as f1_1:
    add(f1.part)

    add(f2.part)  # F5 merges F2

    add(f4.part)  # F5 merges F4
    # F0 (on Top) → F5 (join)
    with BuildSketch(Plane.XY):
        with BuildLine():
            ThreePointArc((-135.4545454545, 29.4999649811), (-110.811935528, 23.0611834436), (-100, 0))
            ThreePointArc((-100, 0), (-110.811935528, -23.0611834436), (-135.4545454545, -29.4999649811))
            Line((-135.4545454545, -29.4999649811), (-29.0909090909, -49.1666083018))
            ThreePointArc((-29.0909090909, -49.1666083018), (-51.9801074533, 38.4353057393), (30, 0))
            ThreePointArc((30, 0), (27.6726575472, -15.0770594741), (20.9072911046, -28.7505397251))
            Line((20.9072911046, -28.7505397251), (100.3773352156, 84.3222672425))
            ThreePointArc((100.3773352156, 84.3222672425), (62.1372291248, 81.1293322591), (65.8020396479, 119.3271032867))
            Line((65.8020396479, 119.3271032867), (-37.4072076356, 48.6768115811))
            ThreePointArc((-37.4072076356, 48.6768115811), (-39.6061075981, 47.487193189), (-42.0037814612, 46.7790173559))
            Line((-42.0037814612, 46.7790173559), (-135.4545454545, 29.4999649811))
        make_face()
    extrude(amount=F5_DEPTH)

    # F6 (on face) → F7 (cut)
    with BuildSketch(Plane.XY.offset(10)):
        with BuildLine():
            ThreePointArc((-100, 0), (-101.4564046173, -9.233805425), (-105.6842108418, -17.5710670597))
            ThreePointArc((-105.6842108418, -17.5710670597), (-106.2728456659, -22.3593219456), (-102.5406702246, -25.4162390665))
            Line((-102.5406702246, -25.4162390665), (-68.9919778385, -31.619394483))
            ThreePointArc((-68.9919778385, -31.619394483), (-64.0232375423, -29.621508542), (-63.7117153904, -24.2752124117))
            ThreePointArc((-63.7117153904, -24.2752124117), (-70, 0), (-63.7117153904, 24.2752124117))
            ThreePointArc((-63.7117153904, 24.2752124117), (-64.0232375423, 29.621508542), (-68.9919778385, 31.619394483))
            Line((-68.9919778385, 31.619394483), (-102.5406702246, 25.4162390665))
            ThreePointArc((-102.5406702246, 25.4162390665), (-106.2728456659, 22.3593219456), (-105.6842108418, 17.5710670597))
            ThreePointArc((-105.6842108418, 17.5710670597), (-101.4564046173, 9.233805425), (-100, 0))
        make_face()
        with BuildLine():
            ThreePointArc((-7.5851052887, 56.9725406605), (-9.6971025879, 52.0512201291), (-6.1461593506, 48.0423885674))
            ThreePointArc((-6.1461593506, 48.0423885674), (15.5729210771, 35.136409692), (28.2097688146, 13.2596452005))
            ThreePointArc((28.2097688146, 13.2596452005), (32.1744542827, 9.6594788843), (37.1214748065, 11.710555748))
            Line((37.1214748065, 11.710555748), (75.9321157128, 66.9317168355))
            ThreePointArc((75.9321157128, 66.9317168355), (76.550641894, 71.4869239552), (73.1884371125, 74.6218985242))
            ThreePointArc((73.1884371125, 74.6218985242), (62.1372291248, 81.1293322591), (55.7667314716, 92.260039849))
            ThreePointArc((55.7667314716, 92.260039849), (52.6735061963, 95.6606933064), (48.1110098301, 95.0984536341))
            Line((48.1110098301, 95.0984536341), (-7.5851052887, 56.9725406605))
        make_face()
    extrude(amount=-F7_DEPTH, mode=Mode.SUBTRACT)

    # F8
    f8_edges = [f1_1.edges().sort_by_distance(p)[0] for p in [
        (-85.766324, 28.517817, 5),
        (-100, 0, 5),
        (20.262952, 76.035497, 5),
        (62.137229, 81.129332, 5),
        (56.526795, 39.321136, 5),
        (-70, 0, 5),
        (-85.766324, -28.517817, 5),
    ]]
    fillet(f8_edges, radius=F8_R)

    # F9: F1 across plane


with BuildPart() as f1_2:
    add(f1_1.part)
    add(f1_1.part.mirror(Plane.XY))


solid = f1_2.part
